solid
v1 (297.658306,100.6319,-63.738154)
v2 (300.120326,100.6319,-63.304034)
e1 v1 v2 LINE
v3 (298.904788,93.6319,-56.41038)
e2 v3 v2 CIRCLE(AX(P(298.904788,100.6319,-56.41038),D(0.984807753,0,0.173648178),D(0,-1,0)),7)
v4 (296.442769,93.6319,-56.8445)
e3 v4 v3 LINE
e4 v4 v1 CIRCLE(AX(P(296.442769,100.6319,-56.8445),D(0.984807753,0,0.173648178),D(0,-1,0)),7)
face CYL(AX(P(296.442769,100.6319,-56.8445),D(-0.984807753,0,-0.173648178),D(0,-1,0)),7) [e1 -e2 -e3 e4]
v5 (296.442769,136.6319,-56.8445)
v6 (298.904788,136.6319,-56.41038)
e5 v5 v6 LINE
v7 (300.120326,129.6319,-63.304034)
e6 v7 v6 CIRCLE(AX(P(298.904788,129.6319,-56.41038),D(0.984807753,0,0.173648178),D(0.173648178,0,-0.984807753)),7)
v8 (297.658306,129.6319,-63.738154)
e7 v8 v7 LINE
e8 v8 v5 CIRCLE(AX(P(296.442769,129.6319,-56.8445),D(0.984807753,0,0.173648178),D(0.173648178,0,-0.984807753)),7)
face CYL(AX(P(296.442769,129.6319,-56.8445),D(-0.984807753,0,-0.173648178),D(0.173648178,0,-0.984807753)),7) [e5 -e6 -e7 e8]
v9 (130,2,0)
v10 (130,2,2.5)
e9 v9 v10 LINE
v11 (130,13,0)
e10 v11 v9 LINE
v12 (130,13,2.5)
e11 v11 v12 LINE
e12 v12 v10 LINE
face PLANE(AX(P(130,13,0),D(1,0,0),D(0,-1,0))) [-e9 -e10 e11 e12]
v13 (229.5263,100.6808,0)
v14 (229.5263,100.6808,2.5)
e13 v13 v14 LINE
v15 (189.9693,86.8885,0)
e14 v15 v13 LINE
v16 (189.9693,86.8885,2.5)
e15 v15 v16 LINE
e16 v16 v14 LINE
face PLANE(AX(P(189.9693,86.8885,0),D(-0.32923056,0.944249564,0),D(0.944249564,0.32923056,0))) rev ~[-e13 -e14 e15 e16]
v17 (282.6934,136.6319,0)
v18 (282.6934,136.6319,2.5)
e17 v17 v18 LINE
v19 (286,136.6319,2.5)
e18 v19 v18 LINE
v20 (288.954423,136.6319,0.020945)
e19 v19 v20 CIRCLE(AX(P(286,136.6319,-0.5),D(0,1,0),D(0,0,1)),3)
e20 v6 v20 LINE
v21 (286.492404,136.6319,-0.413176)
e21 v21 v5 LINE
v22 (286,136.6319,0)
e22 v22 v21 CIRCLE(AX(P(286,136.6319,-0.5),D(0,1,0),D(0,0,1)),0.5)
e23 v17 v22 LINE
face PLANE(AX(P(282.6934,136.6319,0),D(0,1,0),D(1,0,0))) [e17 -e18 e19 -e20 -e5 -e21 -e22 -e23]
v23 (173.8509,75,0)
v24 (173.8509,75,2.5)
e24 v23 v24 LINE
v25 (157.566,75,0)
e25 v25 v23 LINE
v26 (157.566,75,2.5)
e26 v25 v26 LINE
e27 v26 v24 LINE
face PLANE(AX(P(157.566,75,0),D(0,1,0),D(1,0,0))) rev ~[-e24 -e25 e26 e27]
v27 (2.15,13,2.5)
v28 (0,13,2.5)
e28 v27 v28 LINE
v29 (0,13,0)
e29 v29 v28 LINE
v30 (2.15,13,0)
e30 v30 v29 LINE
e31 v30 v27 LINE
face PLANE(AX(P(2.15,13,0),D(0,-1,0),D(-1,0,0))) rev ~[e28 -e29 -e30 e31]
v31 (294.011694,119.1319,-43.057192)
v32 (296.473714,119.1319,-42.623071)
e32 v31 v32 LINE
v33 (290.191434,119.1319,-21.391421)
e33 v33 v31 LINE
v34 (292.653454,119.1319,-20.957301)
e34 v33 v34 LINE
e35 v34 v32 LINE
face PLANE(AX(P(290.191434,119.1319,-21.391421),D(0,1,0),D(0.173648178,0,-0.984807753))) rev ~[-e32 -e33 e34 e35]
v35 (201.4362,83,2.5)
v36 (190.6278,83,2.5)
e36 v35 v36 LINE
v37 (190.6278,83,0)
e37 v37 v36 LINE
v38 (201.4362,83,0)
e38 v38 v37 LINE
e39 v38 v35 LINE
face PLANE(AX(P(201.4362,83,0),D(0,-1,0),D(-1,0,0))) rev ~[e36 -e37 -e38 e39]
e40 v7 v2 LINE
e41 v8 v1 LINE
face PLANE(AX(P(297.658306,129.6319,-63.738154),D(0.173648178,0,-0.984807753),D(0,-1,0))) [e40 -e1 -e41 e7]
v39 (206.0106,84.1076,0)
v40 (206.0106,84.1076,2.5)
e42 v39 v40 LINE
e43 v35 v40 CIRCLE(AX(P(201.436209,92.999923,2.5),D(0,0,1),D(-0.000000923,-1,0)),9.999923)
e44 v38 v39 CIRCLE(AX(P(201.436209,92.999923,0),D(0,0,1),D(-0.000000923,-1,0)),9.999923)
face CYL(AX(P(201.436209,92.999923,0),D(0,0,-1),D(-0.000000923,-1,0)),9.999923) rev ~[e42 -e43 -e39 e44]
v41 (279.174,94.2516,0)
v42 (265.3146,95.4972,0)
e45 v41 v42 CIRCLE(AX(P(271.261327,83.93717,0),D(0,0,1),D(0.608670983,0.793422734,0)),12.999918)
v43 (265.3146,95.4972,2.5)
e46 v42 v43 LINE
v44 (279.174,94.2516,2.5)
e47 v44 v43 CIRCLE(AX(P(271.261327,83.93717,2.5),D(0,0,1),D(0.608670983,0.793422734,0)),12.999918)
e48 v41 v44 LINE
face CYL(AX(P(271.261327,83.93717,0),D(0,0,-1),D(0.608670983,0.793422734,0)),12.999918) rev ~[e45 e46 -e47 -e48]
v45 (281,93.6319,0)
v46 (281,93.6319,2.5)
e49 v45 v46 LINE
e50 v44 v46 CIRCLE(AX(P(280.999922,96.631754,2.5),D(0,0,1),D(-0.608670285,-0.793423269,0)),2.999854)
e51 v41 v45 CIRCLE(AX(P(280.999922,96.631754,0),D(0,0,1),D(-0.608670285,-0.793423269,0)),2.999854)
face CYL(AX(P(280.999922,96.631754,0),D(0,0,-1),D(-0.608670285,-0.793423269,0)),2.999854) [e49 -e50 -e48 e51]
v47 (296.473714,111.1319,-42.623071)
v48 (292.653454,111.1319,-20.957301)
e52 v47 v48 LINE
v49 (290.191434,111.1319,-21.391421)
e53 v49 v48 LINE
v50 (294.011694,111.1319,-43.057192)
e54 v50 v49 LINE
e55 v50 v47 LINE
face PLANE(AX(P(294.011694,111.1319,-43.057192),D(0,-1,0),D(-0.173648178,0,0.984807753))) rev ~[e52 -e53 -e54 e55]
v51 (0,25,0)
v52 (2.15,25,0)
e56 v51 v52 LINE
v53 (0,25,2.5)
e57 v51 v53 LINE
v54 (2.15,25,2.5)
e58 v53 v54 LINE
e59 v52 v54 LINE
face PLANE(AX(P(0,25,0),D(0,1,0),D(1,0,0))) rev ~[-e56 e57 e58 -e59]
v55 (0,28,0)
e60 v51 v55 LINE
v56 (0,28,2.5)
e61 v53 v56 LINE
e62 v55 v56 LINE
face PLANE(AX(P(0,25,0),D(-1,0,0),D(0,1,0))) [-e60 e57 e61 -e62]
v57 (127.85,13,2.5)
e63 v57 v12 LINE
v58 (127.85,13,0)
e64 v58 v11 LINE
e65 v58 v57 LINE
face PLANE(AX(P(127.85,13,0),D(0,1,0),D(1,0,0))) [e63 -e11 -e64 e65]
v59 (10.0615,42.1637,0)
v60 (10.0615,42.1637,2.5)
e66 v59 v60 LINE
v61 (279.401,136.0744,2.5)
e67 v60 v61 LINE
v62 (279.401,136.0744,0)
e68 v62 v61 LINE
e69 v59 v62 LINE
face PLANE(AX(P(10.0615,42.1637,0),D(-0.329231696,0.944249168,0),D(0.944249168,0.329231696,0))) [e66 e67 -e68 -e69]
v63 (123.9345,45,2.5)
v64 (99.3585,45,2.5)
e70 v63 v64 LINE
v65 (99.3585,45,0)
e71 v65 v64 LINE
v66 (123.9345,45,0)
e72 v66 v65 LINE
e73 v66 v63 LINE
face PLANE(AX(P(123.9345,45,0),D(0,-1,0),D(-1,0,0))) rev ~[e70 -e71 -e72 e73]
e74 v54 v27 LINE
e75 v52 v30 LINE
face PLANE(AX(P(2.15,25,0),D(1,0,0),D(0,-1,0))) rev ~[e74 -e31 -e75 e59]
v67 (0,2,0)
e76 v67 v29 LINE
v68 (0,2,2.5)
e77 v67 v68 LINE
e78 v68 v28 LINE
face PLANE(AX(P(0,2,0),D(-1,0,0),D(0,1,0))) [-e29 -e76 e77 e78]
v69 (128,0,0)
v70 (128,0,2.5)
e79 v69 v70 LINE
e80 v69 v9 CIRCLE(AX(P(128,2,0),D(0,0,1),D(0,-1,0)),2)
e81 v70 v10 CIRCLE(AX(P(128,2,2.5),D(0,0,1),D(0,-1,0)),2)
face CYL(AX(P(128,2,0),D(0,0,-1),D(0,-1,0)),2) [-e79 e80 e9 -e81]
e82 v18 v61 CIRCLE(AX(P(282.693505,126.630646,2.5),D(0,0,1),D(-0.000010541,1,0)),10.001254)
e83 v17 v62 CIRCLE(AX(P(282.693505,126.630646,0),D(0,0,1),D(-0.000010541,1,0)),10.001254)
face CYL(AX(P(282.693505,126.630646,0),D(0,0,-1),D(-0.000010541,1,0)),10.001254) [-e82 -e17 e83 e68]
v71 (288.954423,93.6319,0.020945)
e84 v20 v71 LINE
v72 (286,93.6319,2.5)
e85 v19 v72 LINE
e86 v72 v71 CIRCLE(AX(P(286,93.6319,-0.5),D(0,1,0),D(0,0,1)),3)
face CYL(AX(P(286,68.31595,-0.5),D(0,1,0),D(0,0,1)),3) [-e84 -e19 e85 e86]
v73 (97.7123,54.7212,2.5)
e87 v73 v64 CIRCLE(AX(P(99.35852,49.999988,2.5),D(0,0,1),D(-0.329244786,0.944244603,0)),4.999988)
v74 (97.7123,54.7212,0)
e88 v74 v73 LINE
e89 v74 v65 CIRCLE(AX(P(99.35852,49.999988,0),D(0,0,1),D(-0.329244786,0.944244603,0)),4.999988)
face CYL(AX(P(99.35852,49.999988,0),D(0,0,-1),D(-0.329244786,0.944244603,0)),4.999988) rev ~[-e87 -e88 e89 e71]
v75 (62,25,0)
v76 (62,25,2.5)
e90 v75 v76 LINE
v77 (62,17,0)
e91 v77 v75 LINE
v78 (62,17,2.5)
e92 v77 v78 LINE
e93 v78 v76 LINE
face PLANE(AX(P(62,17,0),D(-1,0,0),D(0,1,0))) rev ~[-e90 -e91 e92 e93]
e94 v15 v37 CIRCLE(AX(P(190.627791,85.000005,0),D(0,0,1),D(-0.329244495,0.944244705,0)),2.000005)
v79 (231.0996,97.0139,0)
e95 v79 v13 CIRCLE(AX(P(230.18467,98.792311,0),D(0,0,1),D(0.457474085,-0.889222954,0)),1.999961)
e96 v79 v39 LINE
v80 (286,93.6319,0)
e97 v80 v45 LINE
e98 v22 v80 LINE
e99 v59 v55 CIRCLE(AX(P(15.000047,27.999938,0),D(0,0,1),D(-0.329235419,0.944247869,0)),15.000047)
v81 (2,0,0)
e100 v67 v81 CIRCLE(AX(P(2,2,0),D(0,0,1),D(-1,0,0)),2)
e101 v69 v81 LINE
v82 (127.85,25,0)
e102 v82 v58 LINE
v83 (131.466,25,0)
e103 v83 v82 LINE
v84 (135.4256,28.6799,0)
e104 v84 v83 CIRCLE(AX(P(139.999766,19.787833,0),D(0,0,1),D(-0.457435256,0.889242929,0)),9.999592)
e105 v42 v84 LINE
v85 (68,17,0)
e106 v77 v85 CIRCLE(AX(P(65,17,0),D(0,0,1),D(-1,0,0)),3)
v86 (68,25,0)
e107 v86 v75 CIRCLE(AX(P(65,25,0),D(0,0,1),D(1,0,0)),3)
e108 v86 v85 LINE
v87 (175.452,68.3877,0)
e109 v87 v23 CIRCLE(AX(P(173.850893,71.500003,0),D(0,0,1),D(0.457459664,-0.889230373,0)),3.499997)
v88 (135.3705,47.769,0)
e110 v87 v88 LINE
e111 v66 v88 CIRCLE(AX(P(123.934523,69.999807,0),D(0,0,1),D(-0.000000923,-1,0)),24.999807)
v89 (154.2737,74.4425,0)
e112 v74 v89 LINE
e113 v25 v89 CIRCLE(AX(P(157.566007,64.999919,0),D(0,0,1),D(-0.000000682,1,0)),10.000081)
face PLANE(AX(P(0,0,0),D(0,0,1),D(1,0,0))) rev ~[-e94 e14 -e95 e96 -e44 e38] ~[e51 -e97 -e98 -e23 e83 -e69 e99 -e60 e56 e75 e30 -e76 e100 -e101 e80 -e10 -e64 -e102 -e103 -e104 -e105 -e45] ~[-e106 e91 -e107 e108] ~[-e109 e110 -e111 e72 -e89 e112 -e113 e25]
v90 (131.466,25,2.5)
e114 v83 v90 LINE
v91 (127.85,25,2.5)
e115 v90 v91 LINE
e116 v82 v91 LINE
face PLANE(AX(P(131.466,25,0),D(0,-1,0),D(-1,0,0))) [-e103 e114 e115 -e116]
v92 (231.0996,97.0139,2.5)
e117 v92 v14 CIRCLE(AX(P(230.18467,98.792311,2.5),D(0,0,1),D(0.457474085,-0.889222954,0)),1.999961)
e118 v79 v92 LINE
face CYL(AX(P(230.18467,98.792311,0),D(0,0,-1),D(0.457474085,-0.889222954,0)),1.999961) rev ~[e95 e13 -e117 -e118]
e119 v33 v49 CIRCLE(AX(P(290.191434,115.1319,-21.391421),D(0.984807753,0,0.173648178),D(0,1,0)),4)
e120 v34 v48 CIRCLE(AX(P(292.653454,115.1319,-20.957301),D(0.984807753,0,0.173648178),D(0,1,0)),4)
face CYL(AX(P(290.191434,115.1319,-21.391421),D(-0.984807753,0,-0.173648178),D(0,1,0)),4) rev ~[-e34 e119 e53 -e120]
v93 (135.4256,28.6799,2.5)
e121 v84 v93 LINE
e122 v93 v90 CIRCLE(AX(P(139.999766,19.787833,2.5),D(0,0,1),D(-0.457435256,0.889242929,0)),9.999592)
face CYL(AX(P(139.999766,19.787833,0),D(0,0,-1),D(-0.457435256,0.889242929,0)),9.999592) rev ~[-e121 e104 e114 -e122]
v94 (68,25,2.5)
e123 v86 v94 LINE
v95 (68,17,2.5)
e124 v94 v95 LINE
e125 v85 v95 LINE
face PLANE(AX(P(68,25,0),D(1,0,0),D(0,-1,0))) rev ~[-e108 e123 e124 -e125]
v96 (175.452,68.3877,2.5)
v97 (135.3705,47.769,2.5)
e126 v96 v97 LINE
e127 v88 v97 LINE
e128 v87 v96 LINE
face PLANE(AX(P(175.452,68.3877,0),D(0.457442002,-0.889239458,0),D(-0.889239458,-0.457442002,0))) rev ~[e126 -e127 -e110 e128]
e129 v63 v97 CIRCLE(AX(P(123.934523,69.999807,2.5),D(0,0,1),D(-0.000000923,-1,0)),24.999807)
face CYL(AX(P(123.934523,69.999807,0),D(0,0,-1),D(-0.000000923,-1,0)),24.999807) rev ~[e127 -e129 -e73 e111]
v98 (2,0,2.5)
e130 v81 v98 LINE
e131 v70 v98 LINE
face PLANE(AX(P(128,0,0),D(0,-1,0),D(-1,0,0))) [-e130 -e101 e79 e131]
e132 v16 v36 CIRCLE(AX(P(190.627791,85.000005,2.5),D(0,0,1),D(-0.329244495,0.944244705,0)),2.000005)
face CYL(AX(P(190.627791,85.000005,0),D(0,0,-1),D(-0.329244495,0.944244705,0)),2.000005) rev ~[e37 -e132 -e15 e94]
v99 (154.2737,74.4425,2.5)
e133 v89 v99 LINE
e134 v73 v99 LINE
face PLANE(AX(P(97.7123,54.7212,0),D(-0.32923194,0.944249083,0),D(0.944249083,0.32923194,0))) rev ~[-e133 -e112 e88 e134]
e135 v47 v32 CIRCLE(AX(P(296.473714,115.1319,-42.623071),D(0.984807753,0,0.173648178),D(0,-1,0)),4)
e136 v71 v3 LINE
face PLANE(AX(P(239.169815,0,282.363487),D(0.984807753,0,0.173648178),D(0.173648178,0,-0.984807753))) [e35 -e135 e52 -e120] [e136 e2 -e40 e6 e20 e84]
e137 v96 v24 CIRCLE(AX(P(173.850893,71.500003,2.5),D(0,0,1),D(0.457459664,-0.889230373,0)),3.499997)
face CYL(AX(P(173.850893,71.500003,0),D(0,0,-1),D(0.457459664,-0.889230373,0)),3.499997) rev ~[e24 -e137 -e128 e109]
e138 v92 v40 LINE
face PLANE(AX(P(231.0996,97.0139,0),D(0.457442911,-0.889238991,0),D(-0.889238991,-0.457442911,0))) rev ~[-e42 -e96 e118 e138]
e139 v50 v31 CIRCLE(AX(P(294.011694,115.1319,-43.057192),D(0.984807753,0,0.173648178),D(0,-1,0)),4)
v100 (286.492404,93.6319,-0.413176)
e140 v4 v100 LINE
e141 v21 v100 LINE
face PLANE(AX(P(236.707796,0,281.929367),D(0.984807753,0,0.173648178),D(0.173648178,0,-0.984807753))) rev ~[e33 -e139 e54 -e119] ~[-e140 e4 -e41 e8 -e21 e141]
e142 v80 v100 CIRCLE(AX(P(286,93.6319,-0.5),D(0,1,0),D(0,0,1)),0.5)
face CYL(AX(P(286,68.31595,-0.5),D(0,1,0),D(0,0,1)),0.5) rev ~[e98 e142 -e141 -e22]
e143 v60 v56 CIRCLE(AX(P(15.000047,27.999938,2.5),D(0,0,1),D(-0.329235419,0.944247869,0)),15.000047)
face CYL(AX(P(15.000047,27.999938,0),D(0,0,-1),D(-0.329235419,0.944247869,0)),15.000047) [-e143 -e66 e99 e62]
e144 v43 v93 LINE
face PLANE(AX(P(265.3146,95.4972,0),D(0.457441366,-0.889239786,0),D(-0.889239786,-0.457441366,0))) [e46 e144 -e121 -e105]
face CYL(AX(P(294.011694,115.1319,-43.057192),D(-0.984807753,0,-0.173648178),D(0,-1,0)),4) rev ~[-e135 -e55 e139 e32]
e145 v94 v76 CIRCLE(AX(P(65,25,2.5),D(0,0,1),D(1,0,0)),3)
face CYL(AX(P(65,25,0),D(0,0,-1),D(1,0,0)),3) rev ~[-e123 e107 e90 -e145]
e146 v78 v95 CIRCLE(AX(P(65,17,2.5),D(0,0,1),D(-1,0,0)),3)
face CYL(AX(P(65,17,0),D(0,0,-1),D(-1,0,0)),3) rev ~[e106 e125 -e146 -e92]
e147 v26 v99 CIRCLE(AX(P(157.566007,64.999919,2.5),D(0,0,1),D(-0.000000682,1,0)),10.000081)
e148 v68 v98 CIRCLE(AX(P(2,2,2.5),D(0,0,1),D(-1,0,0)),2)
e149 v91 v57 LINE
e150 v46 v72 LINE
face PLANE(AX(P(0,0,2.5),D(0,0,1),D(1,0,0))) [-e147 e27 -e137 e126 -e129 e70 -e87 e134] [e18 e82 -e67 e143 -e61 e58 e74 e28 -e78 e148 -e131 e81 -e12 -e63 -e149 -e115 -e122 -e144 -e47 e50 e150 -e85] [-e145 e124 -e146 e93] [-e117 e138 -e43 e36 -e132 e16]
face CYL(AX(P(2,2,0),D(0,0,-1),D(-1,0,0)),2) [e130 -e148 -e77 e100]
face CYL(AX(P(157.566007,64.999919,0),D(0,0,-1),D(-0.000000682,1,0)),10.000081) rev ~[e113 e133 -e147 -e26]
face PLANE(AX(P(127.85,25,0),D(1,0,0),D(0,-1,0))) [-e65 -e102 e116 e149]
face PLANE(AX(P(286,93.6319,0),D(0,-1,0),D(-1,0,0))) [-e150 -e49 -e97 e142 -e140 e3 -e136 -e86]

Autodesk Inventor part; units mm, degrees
ref_plane "YZ Plane" through (0, 0, 0) normal (1, 0, 0) x (0, 1, 0)
ref_plane "XZ Plane" through (0, 0, 0) normal (0, 1, 0) x (-1, 0, 0)
sketch "草圖1" plane through (0, 0, 0) normal (0, 0, 1) x (1, 0, 0)
  line L0 (0, 0) -> (-7.8042, 0) construction
  line L1 (0, 0) -> (0, -16.694) construction
  line L2 (0, 2) -> (0, 13)
  line L3 (286, 136.6319) -> (286, 93.6319)
  line L4 (130, 19.7875) -> (130, 13) construction
  line L5 (128, 0) -> (2, 0)
  line L6 (286, 136.6319) -> (344, 136.6319)
  line L7 (351, 129.6319) -> (351, 100.6319)
  line L8 (344, 93.6319) -> (286, 93.6319)
  line L9 (308, 119.1319) -> (330, 119.1319)
  arc A0 (330, 111.1319) -> (330, 119.1319) centre (330, 115.1319) ccw
  line L10 (330, 111.1319) -> (308, 111.1319)
  arc A1 (308, 119.1319) -> (308, 111.1319) centre (308, 115.1319) ccw
  arc A2 (10.0615, 42.1637) -> (0, 28) centre (15, 28) ccw
  line L11 (10.0615, 42.1637) -> (279.401, 136.0744)
  line L12 (282.6934, 136.6319) -> (286, 136.6319)
  line L13 (286, 93.6319) -> (281, 93.6319)
  line L14 (265.3146, 95.4972) -> (135.4256, 28.6799)
  arc A3 (351, 129.6319) -> (344, 136.6319) centre (344, 129.6319) ccw
  arc A4 (344, 93.6319) -> (351, 100.6319) centre (344, 100.6319) ccw
  arc A5 (279.174, 94.2516) -> (281, 93.6319) centre (281, 96.6319) ccw
  arc A6 (279.174, 94.2516) -> (265.3146, 95.4972) centre (271.2613, 83.9371) ccw
  arc A7 (282.6934, 136.6319) -> (279.401, 136.0744) centre (282.6934, 126.6319) ccw
  arc A8 (135.4256, 28.6799) -> (131.466, 25) centre (140, 19.7875) ccw
  line L15 (0, 25) -> (2.15, 25)
  line L16 (2.15, 25) -> (2.15, 13)
  line L17 (2.15, 13) -> (0, 13)
  line L18 (0, 13) -> (0, 25) construction
  line L19 (65, 0) -> (65, 25) construction
  line L20 (131.466, 25) -> (127.85, 25)
  line L21 (127.85, 25) -> (127.85, 13)
  line L22 (127.85, 13) -> (130, 13)
  line L23 (130, 13) -> (130, 19.7875) construction
  arc A9 (0, 2) -> (2, 0) centre (2, 2) ccw
  arc A10 (128, 0) -> (130, 2) centre (128, 2) ccw
  line L24 (0, 13) -> (0, 25) construction
  line L25 (0, 25) -> (0, 28)
  line L26 (130, 19.7875) -> (130, 25) construction
  line L27 (130, 13) -> (130, 2)
  line L28 (123.9345, 45) -> (99.3585, 45)
  line L29 (157.566, 75) -> (173.8509, 75)
  line L30 (97.7123, 54.7212) -> (154.2737, 74.4425)
  line L31 (175.452, 68.3877) -> (135.3705, 47.769)
  arc A11 (175.452, 68.3877) -> (173.8509, 75) centre (173.8509, 71.5) ccw
  arc A12 (97.7123, 54.7212) -> (99.3585, 45) centre (99.3585, 50) ccw
  arc A13 (123.9345, 45) -> (135.3705, 47.769) centre (123.9345, 70) ccw
  arc A14 (157.566, 75) -> (154.2737, 74.4425) centre (157.566, 65) ccw
  line L32 (189.9693, 86.8885) -> (229.5263, 100.6808)
  line L33 (231.0996, 97.0139) -> (206.0106, 84.1076)
  line L34 (201.4362, 83) -> (190.6278, 83)
  arc A15 (231.0996, 97.0139) -> (229.5263, 100.6808) centre (230.1847, 98.7923) ccw
  arc A16 (201.4362, 83) -> (206.0106, 84.1076) centre (201.4362, 93) ccw
  arc A17 (189.9693, 86.8885) -> (190.6278, 83) centre (190.6278, 85) ccw
  arc A18 (131.466, 25) -> (130, 19.7875) centre (140, 19.7875) ccw construction
  line L35 (68, 25) -> (68, 17)
  arc A19 (62, 17) -> (68, 17) centre (65, 17) ccw
  line L36 (62, 17) -> (62, 25)
  arc A20 (68, 25) -> (62, 25) centre (65, 25) ccw
  point P0 (130, 0)
  point P1 (351, 136.6319)
  point P2 (351, 93.6319)
  point P3 (130, 25.8889)
  point P4 (281, 136.6319)
  point P5 (281, 93.6319)
  point P6 (281, 103.5661)
  point P7 (0, 10.2)
  point P8 (130, 28)
  point P9 (130, 10.2)
  dimension "d0" = 130
  dimension "d1" = 136.6319
  dimension "d2" = 43
  dimension "d3" = 65
  dimension "d4" = 8
  dimension "d5" = 30
  dimension "d7" = 18
  dimension "d8" = 286
  dimension "d17" = 21.5
  dimension "d20" = 15
  dimension "d21" = 28
  dimension "d23" = 5
  dimension "d24" = 7
  dimension "d26" = 3
  dimension "d29" = 13
  dimension "d30" = 5
  dimension "d31" = 10
  dimension "d32" = 10
  dimension "d33" = 8
  dimension "d39" = 12
  dimension "d41" = 13
  dimension "d42" = 2
  dimension "d45" = 45
  dimension "d46" = 17
  dimension "d47" = 17
  dimension "d48" = 30
  dimension "d49" = 3.5
  dimension "d50" = 5
  dimension "d51" = 25
  dimension "d52" = 10
  dimension "d53" = 8
  dimension "d54" = 2
  dimension "d55" = 10
  dimension "d56" = 2
  dimension "d57" = 19.7875
  dimension "d60" = 6
  dimension "d61" = 8
  dimension "d63" = 17
  dimension "d64" = 19.222
  dimension "d65" = 125.7
extrude "擠出1" add sketch "草圖1" along normal blind 2.5
bend part "折彎零件1" radius 0.5 angle 80 line through (286, 136.6319, 0) along (0, -1, 0) centre toward (0, 0, -1) moving side (1, 0, 0) both sides no
ref_plane "工作平面1" through (65, 2, 0) normal (-1, 0, 0) x (0, 0, 1)
properties part number "0 零件" material "不鏽鋼SUS-HL(砂紋)"
